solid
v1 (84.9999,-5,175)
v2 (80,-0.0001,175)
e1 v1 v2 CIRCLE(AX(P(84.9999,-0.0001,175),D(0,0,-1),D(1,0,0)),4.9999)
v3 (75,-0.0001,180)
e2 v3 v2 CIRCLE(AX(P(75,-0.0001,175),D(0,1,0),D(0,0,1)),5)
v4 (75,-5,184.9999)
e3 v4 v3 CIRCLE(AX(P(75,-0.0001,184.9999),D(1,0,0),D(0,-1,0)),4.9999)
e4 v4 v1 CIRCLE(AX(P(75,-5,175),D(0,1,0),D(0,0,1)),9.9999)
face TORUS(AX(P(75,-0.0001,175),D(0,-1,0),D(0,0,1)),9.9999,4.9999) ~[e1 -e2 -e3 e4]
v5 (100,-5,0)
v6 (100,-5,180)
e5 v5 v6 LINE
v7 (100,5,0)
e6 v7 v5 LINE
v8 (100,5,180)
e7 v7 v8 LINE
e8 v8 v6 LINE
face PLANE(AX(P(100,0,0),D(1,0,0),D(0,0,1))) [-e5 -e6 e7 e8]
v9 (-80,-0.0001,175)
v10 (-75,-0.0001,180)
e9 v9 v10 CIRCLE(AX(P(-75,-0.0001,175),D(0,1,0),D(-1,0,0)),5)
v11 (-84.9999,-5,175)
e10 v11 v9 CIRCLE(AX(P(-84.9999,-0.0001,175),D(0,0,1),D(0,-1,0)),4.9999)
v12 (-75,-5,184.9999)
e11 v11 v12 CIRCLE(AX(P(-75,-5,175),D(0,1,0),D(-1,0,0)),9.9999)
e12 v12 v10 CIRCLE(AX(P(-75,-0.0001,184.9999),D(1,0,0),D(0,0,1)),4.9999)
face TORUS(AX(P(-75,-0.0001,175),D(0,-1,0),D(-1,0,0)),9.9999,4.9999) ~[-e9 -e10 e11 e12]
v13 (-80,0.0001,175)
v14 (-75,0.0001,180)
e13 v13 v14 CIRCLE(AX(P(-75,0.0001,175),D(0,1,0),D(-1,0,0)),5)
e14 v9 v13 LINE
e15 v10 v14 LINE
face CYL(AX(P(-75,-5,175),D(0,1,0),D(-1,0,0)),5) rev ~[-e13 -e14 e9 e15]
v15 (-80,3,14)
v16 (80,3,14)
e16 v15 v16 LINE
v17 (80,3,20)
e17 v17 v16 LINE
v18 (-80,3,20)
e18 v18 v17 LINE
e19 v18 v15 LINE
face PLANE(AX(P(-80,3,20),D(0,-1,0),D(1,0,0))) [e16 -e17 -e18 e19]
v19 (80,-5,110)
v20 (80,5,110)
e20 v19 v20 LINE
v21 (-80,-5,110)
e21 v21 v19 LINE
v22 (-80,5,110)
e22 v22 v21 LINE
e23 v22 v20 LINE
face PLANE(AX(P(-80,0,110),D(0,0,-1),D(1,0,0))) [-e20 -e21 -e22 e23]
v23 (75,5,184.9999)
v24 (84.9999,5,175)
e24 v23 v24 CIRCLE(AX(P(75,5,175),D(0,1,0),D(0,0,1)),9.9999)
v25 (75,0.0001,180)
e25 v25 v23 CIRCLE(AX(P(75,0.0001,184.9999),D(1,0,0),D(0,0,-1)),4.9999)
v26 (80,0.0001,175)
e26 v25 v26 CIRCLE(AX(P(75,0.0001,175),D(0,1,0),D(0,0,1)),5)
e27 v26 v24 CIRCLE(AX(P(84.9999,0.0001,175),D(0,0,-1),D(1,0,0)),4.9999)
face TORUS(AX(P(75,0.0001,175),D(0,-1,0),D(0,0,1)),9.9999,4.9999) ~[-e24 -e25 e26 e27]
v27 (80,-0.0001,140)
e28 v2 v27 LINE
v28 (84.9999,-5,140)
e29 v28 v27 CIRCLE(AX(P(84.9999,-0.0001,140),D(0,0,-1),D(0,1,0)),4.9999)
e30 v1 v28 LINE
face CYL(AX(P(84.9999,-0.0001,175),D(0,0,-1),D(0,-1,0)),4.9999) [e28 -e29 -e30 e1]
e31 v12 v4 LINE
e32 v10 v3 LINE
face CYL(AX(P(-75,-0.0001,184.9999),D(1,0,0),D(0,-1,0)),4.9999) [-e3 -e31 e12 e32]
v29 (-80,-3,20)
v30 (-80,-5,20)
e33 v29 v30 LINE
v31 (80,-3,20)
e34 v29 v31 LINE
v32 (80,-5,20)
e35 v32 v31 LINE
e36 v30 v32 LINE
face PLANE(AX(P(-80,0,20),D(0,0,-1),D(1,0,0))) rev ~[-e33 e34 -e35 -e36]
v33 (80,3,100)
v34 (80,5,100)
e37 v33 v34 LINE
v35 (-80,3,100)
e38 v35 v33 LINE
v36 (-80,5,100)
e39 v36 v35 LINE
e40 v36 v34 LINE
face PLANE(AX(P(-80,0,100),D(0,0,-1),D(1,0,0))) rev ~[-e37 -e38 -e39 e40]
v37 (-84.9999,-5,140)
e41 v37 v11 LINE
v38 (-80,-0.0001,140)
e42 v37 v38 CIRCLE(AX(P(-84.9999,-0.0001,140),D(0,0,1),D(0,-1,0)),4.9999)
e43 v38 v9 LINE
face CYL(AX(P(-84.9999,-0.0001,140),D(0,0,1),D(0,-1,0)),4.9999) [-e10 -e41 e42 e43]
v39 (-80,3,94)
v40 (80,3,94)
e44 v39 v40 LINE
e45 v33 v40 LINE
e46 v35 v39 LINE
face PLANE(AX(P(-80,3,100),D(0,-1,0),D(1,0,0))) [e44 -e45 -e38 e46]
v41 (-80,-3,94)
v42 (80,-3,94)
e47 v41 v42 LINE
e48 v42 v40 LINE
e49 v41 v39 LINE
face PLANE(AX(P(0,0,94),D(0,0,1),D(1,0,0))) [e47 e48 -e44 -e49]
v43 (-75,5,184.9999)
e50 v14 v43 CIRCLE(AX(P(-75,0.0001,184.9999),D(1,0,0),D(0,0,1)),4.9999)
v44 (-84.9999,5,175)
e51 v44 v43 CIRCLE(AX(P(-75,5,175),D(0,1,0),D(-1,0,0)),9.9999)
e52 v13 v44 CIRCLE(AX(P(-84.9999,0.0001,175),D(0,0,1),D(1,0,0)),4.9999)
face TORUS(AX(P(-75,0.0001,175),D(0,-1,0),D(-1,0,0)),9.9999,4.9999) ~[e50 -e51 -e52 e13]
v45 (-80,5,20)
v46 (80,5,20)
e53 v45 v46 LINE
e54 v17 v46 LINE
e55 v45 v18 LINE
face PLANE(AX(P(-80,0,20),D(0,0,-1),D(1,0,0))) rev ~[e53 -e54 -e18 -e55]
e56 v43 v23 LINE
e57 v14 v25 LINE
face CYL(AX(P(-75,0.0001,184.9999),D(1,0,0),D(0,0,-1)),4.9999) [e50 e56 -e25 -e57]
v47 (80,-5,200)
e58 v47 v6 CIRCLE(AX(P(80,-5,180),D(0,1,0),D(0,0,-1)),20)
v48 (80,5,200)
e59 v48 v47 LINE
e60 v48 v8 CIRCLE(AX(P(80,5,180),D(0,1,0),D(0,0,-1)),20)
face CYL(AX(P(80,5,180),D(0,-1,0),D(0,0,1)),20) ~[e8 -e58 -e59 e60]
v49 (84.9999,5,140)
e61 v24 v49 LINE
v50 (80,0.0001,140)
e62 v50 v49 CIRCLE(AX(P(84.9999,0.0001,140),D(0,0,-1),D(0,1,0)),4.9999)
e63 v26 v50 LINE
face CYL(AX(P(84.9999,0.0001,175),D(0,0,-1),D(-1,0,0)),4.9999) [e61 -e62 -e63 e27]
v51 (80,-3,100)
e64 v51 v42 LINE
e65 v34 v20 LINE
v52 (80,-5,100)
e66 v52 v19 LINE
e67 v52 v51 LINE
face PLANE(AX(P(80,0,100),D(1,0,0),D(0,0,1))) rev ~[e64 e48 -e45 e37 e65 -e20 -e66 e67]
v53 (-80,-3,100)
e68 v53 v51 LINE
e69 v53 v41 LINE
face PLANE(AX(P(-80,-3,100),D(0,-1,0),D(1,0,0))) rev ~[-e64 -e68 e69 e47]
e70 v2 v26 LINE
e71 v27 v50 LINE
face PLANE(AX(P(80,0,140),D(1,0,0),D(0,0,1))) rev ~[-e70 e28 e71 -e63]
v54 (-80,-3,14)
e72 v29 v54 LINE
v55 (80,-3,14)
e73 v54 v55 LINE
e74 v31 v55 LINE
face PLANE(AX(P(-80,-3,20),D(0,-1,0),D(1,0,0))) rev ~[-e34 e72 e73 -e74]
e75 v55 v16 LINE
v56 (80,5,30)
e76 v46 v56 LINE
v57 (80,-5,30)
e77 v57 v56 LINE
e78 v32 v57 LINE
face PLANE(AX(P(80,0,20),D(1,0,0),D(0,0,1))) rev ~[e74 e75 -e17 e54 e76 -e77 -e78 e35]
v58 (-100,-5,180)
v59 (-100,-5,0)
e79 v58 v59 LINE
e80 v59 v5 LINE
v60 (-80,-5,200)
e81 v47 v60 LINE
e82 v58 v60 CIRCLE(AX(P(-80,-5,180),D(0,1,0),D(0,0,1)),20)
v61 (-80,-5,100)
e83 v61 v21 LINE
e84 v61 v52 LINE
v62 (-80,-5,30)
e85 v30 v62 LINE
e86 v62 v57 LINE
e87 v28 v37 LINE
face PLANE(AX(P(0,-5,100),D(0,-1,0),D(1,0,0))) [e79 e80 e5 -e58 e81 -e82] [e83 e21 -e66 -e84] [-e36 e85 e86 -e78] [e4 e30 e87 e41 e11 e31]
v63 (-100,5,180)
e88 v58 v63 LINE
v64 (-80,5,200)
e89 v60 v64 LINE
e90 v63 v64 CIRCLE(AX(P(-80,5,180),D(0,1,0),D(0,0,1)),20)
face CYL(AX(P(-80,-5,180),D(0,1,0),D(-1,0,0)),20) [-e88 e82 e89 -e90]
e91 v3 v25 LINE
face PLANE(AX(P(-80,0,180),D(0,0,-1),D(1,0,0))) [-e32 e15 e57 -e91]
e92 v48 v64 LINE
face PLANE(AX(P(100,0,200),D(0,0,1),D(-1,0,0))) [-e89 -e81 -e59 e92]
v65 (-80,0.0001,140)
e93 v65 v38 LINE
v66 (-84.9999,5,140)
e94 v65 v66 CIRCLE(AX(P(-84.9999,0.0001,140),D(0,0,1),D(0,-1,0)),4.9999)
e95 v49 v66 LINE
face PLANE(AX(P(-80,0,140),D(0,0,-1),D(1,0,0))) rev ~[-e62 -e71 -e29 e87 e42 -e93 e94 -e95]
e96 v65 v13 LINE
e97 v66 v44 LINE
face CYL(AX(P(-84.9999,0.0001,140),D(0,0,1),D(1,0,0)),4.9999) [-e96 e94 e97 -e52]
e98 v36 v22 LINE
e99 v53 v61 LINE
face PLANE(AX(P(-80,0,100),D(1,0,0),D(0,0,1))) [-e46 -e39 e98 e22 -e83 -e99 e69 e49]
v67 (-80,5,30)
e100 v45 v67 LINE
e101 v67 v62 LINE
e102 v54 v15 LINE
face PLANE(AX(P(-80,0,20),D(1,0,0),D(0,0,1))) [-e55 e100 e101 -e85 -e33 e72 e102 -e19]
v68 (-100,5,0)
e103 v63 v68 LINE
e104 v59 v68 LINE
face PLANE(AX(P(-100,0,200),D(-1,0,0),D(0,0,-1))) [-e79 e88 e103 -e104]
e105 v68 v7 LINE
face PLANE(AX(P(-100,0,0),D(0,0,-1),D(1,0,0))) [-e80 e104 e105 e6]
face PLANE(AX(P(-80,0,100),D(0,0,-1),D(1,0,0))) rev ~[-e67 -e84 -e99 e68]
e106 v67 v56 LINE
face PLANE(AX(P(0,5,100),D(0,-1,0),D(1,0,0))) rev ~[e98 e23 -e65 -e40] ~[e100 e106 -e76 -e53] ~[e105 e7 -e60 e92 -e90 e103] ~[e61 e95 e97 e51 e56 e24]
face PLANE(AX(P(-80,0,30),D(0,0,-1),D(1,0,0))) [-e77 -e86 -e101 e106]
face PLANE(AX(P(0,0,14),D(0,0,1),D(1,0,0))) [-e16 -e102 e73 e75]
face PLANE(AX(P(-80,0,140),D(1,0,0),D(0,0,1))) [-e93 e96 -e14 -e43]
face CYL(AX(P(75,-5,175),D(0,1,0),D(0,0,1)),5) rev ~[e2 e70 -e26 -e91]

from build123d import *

# Parameters (mm, degrees)
F0_W          = 160
F0_H          = 10
F0_H_2        = 40
F1_DEPTH      = 5
F1_DEPTH_BACK = 5
F2_F1_R       = 5
F2_F2_R       = 4.9999
F3_R          = 20
F4_W          = 160
F4_H          = 6
F5_DEPTH      = 6
F6_W          = 160
F6_H          = 6
F7_DEPTH      = 6


# Not quite as in the source:
# - a fillet or chamfer is up to 0.001 mm smaller than in the source, because OpenCascade refuses the exact size


with BuildPart() as f1:
    # F0 (on Front) → F1 (new body, two sides)
    with BuildSketch(Plane.XZ) as f1_sk:
        Polygon((-100, 0), (0, 0), (100, 0), (100, 200), (0, 200), (-100, 200), align=None)
        with Locations((0, 25)):
            Rectangle(F0_W, F0_H, mode=Mode.SUBTRACT)
        with Locations((0, 105)):
            Rectangle(F0_W, F0_H, mode=Mode.SUBTRACT)
        with Locations((0, 160)):
            Rectangle(F0_W, F0_H_2, mode=Mode.SUBTRACT)
    extrude(amount=F1_DEPTH)
    extrude(f1_sk.sketch, amount=-F1_DEPTH_BACK)

    # F2: fillet of radius 5 on 4 edges, made by hand

    # F2_f1
    f2_f1_edges = [f1.edges().sort_by_distance(p)[0] for p in [
        (80, 0, 180),
        (-80, 0, 180),
    ]]
    fillet(f2_f1_edges, radius=F2_F1_R)

    # F2_f2 (radius 5 in the source; OpenCascade refuses exactly that, so slightly less here)
    f2_f2_edges = [f1.edges().sort_by_distance(p)[0] for p in [
        (0, -5, 180),
        (0, 5, 180),
        (-78.5355339059, 5, 178.5355339059),
        (78.5355339059, 5, 178.5355339059),
        (-78.5355339059, -5, 178.5355339059),
        (78.5355339059, -5, 178.5355339059),
    ]]
    fillet(f2_f2_edges, radius=F2_F2_R)

    # F3
    f3_edges = [f1.edges().sort_by_distance(p)[0] for p in [
        (-100, 0, 200),
        (100, 0, 200),
    ]]
    fillet(f3_edges, radius=F3_R)

    # F4 (on face) → F5 (cut)
    with BuildSketch(Plane.XY.offset(20)):
        Rectangle(F4_W, F4_H)
    extrude(amount=-F5_DEPTH, mode=Mode.SUBTRACT)

    # F6 (on face) → F7 (cut)
    with BuildSketch(Plane.XY.offset(100)):
        Rectangle(F6_W, F6_H)
    extrude(amount=-F7_DEPTH, mode=Mode.SUBTRACT)


solid = f1.part
